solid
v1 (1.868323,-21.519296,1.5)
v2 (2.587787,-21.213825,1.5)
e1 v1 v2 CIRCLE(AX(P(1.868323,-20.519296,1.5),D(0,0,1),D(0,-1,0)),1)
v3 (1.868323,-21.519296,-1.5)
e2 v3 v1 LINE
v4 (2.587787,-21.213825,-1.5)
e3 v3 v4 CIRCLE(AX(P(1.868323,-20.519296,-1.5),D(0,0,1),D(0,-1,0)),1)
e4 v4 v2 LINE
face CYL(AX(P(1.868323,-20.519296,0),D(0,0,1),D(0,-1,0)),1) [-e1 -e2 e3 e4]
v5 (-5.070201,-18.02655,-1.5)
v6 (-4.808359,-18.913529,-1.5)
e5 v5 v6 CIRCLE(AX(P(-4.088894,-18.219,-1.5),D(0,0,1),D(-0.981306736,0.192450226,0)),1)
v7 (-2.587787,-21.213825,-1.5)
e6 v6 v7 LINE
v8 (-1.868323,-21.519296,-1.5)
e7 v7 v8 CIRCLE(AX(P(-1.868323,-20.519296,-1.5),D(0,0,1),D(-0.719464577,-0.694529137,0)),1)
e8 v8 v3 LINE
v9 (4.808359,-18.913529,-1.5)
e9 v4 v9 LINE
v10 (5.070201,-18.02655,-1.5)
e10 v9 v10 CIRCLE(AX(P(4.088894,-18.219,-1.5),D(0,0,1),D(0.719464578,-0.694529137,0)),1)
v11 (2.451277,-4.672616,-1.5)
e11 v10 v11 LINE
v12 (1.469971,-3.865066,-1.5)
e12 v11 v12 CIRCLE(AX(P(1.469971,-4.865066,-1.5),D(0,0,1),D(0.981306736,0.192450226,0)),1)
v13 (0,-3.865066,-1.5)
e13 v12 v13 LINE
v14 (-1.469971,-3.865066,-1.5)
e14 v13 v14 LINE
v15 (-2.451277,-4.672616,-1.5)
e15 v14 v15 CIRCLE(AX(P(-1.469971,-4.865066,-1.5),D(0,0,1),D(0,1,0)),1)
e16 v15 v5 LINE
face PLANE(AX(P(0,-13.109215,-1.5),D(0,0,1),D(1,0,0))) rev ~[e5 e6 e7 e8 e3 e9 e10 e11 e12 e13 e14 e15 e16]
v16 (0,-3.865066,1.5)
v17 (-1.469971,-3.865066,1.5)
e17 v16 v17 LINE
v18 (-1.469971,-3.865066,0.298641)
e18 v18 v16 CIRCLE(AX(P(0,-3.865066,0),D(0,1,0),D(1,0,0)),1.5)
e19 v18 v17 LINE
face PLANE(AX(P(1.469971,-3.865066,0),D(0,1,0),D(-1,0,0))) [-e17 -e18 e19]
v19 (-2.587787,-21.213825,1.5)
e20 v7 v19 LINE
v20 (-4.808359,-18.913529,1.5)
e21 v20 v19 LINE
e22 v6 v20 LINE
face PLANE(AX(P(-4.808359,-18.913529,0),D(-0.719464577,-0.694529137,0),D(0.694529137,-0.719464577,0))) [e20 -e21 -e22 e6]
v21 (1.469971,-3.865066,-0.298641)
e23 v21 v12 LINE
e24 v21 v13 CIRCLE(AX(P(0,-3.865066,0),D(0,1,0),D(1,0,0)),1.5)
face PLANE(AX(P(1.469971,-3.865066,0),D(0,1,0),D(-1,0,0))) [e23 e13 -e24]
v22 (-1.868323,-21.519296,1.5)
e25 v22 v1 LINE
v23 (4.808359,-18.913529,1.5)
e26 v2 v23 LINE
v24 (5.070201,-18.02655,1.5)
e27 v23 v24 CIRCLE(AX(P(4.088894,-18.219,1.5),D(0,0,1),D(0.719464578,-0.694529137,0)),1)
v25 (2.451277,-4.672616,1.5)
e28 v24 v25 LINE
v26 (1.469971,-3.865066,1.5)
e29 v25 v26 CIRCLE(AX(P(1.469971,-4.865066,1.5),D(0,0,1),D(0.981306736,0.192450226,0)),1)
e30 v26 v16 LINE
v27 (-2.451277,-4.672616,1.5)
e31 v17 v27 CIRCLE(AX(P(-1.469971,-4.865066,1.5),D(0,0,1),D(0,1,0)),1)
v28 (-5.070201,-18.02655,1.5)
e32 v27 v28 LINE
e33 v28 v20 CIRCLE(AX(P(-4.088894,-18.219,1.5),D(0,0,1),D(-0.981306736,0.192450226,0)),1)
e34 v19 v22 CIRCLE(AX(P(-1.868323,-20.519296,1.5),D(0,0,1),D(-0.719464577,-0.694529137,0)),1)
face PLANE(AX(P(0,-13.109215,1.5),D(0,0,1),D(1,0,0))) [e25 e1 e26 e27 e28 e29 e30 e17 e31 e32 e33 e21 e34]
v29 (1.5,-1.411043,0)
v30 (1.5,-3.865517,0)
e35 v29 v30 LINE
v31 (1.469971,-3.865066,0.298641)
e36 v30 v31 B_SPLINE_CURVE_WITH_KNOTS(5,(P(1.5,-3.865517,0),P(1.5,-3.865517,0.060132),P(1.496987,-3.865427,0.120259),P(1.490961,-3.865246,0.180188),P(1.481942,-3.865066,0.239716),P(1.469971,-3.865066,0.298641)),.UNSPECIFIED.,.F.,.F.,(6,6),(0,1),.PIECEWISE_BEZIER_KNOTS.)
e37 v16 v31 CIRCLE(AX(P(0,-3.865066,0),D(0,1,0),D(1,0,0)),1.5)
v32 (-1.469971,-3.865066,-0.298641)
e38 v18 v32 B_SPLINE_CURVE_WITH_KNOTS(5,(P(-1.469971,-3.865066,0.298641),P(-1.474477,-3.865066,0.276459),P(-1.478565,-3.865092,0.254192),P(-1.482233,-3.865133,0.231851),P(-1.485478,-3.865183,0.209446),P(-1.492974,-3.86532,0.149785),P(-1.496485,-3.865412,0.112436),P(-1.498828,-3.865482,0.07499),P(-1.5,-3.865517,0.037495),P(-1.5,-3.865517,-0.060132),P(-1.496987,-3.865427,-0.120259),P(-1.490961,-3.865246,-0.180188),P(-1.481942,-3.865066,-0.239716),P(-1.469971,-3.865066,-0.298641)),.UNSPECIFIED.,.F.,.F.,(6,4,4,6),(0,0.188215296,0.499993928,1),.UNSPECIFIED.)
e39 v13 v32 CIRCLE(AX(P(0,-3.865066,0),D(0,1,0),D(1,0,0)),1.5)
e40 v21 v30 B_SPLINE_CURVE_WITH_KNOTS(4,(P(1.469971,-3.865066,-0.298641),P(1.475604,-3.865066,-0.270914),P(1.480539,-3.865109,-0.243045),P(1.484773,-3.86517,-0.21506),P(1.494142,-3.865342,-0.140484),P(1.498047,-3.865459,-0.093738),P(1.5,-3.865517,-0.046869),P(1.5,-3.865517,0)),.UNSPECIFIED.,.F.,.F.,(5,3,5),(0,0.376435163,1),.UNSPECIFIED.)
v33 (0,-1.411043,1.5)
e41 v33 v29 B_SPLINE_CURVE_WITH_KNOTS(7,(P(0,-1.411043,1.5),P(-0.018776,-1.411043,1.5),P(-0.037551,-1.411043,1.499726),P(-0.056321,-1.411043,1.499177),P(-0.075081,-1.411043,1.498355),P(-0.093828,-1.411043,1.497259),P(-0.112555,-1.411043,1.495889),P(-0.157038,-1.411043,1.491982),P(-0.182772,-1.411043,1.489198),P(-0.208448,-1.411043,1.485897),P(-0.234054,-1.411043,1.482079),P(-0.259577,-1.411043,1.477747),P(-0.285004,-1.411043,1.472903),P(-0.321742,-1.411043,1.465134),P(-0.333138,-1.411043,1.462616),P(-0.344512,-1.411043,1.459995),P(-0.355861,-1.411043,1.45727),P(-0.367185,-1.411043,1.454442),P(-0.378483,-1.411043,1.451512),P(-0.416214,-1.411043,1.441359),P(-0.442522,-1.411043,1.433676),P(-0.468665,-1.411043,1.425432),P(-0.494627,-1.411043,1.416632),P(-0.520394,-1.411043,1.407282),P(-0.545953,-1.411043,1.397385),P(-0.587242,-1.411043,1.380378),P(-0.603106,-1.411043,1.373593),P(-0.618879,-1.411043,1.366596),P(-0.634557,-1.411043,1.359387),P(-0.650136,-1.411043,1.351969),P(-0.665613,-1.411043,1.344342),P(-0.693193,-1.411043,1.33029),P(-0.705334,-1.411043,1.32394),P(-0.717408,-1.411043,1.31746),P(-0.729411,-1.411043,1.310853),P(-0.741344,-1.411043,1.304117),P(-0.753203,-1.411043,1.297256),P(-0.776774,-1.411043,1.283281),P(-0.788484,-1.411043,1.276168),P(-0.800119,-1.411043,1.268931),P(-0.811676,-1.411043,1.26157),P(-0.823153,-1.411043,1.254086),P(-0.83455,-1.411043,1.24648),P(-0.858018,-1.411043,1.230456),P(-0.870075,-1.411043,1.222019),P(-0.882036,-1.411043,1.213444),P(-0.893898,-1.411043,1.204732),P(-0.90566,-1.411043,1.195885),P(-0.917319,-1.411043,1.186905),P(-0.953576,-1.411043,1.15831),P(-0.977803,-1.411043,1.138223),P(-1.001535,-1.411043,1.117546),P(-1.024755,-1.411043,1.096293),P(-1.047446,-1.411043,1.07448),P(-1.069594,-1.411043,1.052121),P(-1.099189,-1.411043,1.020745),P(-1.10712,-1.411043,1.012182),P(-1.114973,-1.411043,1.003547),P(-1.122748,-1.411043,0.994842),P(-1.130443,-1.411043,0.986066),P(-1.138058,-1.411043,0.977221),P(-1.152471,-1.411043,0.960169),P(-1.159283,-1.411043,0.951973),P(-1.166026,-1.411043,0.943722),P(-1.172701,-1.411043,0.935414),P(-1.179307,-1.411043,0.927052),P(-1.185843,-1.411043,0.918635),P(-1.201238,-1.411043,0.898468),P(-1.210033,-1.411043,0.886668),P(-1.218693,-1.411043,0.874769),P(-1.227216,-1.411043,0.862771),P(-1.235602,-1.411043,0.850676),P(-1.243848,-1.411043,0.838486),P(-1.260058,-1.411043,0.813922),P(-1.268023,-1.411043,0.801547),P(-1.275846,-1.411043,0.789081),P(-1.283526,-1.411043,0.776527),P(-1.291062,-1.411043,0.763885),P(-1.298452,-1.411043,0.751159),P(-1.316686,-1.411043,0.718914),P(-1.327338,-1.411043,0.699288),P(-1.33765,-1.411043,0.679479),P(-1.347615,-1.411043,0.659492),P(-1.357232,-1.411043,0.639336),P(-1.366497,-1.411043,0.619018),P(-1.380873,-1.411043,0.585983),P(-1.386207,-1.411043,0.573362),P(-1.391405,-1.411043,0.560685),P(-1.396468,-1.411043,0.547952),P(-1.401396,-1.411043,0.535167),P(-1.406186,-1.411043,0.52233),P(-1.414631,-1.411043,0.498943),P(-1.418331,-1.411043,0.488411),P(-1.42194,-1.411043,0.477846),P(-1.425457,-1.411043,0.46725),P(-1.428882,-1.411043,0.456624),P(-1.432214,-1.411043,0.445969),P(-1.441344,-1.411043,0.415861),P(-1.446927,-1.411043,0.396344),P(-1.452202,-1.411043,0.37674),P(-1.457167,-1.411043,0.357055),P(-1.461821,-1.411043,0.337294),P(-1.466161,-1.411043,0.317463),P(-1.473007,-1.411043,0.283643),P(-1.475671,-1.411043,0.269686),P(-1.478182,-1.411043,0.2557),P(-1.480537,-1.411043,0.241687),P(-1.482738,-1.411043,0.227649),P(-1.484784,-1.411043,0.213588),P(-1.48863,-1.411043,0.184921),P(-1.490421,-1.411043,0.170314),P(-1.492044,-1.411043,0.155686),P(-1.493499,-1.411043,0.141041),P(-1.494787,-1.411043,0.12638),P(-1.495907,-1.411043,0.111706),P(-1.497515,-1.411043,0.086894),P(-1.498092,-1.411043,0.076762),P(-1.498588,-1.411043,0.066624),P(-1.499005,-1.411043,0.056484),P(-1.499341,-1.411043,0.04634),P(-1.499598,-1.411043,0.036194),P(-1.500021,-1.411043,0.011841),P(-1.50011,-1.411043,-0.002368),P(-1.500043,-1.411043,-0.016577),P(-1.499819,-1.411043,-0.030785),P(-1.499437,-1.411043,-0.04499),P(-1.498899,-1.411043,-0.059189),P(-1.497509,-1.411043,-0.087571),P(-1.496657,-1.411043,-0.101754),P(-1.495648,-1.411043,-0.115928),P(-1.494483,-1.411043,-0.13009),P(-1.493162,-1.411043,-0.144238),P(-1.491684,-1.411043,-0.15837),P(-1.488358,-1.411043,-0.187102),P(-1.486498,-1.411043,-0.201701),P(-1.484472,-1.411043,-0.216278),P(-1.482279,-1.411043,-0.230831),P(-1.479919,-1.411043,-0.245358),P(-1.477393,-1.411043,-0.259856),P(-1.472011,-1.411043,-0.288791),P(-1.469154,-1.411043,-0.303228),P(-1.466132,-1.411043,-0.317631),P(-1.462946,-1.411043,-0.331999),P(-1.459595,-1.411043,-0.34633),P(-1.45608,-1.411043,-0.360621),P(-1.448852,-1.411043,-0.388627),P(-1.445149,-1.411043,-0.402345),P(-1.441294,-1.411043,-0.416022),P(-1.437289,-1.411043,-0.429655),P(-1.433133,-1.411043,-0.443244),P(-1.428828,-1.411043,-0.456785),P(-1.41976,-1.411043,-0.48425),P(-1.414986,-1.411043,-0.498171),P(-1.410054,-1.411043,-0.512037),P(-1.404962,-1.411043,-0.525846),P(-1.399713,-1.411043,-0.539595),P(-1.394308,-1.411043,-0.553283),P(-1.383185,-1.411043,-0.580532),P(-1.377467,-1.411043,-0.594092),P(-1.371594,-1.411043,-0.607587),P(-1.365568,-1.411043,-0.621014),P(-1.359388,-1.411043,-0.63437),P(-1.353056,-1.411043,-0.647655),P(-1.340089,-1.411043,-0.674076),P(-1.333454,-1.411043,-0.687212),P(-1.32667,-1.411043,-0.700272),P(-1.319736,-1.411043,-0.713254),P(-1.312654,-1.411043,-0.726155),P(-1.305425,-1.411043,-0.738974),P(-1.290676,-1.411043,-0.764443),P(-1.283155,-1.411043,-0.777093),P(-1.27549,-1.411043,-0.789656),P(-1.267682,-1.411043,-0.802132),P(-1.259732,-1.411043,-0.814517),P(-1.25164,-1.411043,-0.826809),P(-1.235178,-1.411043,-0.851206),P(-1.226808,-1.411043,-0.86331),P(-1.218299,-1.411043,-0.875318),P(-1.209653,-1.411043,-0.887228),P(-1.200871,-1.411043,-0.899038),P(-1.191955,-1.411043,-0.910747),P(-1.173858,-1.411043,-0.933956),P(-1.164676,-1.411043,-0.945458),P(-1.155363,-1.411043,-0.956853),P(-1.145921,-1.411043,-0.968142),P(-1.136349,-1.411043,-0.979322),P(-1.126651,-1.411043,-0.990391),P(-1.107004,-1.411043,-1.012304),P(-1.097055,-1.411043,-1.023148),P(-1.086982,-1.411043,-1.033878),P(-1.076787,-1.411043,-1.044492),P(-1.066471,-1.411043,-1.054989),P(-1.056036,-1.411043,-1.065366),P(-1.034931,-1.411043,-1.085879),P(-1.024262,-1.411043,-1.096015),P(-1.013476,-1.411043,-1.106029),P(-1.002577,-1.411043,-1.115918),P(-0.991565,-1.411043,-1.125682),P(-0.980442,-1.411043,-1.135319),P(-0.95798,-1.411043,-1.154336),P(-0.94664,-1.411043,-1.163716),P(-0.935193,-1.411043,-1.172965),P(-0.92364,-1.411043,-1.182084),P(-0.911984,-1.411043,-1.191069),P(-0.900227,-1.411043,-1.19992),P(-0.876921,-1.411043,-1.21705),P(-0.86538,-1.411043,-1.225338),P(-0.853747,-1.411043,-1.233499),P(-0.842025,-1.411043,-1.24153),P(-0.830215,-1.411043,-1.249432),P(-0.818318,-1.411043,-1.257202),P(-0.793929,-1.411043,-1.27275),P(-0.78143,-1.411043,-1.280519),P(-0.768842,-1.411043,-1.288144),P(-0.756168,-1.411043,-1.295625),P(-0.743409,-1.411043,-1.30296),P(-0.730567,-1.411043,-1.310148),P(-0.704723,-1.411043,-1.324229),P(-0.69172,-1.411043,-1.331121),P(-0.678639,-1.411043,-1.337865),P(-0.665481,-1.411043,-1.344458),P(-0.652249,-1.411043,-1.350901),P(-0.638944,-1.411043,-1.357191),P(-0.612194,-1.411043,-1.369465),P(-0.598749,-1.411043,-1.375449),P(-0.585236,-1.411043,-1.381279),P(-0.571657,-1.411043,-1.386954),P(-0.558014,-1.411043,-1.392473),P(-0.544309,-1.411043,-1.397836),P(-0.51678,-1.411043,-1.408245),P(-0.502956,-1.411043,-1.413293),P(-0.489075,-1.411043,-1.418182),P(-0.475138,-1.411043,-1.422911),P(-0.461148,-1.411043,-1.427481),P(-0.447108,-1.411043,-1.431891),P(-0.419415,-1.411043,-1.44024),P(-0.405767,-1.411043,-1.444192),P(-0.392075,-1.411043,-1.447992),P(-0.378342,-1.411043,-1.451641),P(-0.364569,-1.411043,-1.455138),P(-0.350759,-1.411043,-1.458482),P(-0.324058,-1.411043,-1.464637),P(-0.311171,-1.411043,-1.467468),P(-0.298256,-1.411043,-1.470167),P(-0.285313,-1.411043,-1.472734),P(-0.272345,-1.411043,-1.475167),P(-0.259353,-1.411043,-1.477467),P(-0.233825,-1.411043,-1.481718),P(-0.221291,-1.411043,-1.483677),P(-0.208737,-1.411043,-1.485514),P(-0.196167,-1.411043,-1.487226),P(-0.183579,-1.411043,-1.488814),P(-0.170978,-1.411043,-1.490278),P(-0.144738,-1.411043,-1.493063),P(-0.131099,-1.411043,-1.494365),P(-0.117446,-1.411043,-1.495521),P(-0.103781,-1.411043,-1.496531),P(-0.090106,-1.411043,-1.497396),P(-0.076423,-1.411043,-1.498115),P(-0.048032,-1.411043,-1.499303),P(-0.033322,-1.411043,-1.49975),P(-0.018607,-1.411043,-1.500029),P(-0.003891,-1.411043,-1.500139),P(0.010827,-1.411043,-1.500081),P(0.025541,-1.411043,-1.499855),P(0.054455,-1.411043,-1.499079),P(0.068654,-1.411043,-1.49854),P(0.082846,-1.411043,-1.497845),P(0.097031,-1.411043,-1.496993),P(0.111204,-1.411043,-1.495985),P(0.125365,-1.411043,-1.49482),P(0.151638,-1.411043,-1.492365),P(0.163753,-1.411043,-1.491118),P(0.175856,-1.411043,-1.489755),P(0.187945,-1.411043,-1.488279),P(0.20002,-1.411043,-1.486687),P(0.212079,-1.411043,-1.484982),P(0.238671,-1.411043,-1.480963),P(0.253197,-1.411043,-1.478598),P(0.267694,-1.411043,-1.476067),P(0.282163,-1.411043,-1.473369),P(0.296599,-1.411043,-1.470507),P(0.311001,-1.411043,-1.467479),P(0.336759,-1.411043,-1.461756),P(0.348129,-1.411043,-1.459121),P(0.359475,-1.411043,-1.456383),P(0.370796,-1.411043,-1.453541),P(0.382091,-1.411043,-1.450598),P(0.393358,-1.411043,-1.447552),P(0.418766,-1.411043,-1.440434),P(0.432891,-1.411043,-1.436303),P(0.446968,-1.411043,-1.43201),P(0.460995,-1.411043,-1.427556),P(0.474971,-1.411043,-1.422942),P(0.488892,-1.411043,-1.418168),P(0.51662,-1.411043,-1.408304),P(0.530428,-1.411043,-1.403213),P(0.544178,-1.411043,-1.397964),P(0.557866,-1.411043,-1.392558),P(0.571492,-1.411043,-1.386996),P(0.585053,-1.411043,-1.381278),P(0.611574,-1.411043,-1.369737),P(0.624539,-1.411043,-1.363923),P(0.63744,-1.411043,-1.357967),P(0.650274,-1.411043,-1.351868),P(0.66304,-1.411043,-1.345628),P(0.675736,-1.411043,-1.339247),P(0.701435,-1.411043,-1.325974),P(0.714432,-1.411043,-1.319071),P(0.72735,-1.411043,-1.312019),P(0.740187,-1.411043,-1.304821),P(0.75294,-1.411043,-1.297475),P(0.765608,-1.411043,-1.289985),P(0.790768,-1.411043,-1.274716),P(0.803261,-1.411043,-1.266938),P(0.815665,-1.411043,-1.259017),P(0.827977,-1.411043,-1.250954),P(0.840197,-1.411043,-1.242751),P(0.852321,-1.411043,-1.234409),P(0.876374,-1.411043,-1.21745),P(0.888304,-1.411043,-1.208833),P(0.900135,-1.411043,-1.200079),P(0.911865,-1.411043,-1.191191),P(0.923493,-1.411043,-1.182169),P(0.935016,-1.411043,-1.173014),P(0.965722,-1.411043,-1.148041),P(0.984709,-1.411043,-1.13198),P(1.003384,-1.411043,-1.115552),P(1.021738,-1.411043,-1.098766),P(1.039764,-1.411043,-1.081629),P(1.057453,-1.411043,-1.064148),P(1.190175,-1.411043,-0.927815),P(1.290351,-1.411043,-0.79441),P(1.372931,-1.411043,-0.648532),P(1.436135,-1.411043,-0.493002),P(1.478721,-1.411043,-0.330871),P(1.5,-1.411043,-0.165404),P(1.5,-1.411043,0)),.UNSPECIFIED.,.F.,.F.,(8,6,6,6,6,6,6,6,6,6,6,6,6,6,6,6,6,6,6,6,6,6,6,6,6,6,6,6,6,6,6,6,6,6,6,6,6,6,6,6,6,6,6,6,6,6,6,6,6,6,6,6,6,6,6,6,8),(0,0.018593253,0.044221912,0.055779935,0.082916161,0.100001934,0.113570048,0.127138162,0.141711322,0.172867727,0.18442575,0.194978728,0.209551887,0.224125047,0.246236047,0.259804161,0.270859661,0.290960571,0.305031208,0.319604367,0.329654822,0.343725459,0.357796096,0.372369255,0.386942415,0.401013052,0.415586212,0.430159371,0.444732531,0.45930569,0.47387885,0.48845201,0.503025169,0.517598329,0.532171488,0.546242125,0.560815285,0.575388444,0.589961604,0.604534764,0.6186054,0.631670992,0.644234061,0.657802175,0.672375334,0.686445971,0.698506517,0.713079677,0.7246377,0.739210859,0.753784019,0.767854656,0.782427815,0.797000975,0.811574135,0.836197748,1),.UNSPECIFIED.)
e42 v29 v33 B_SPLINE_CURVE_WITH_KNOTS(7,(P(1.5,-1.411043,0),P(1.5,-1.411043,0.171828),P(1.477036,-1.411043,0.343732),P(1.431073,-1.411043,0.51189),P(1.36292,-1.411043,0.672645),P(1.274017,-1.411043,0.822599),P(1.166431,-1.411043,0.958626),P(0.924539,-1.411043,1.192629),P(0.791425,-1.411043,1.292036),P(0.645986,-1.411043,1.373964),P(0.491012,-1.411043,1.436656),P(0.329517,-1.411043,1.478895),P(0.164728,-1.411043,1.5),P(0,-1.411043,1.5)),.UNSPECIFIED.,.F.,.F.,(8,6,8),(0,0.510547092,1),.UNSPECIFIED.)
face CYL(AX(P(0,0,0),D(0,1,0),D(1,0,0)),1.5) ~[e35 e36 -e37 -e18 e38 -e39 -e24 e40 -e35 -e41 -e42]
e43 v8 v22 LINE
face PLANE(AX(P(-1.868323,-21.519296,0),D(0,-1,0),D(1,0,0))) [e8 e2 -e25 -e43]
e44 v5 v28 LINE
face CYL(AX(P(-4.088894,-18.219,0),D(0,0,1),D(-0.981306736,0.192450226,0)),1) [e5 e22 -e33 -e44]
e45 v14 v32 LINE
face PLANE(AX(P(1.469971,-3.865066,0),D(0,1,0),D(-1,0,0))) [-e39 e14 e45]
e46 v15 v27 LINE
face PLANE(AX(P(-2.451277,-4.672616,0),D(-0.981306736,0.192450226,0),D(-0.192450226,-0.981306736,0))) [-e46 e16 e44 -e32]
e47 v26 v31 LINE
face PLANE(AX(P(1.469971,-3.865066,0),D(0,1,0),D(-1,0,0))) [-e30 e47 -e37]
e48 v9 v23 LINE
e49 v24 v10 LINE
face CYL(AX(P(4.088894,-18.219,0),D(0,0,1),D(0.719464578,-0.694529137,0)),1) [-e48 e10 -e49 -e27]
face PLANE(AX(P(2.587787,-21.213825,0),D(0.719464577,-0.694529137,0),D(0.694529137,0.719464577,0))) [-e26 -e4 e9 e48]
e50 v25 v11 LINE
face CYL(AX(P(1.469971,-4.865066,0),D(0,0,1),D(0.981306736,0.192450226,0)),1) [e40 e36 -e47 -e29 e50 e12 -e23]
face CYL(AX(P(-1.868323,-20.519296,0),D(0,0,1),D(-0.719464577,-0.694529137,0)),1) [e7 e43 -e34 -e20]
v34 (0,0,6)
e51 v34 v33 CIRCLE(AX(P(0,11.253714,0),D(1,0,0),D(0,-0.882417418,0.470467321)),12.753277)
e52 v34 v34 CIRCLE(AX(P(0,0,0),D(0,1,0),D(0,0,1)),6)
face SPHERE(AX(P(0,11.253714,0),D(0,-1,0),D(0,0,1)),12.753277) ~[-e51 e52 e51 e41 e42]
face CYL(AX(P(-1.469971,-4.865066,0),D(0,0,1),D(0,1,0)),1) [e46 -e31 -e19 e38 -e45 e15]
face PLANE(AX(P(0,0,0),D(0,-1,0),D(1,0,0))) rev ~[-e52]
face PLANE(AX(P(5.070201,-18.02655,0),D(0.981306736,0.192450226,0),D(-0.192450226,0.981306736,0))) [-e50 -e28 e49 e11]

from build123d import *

# Parameters (mm, degrees)
F2_R     = 1.5
F3_DEPTH = 4
F5_DEPTH = 1.5


with BuildPart() as f1:
    # F0 (on Right) → F1 (revolve)
    with BuildSketch(Plane.YZ):
        with BuildLine():
            Line((0, 0), (0, 6))
            ThreePointArc((0, 6), (-1.1189941578, 3.0922762594), (-1.4995632221, 0))
            Line((-1.4995632221, 0), (0, 0))
        make_face()
    revolve(axis=Axis((0, 0.9339665994, 0), (0, 1, 0)))

    # F2 (on Front) → F3 (join)
    with BuildSketch(Plane.XZ):
        Circle(F2_R)
    extrude(amount=F3_DEPTH)

    # F4 (on Top) → F5 (join, symmetric)
    with BuildSketch(Plane.XY):
        with BuildLine():
            Line((1.4699705266, -3.8650664501), (0, -3.8650664501))
            Line((0, -3.8650664501), (-1.4699705266, -3.8650664501))
            ThreePointArc((-1.4699705266, -3.8650664501), (-2.105403361, -4.0929103047), (-2.4512772628, -4.6726162242))
            Line((-2.4512772628, -4.6726162242), (-5.0702010152, -18.0265497334))
            ThreePointArc((-5.0702010152, -18.0265497334), (-5.0479765813, -18.5021273815), (-4.8083588564, -18.913529096))
            Line((-4.8083588564, -18.913529096), (-2.5877873591, -21.213825008))
            ThreePointArc((-2.5877873591, -21.213825008), (-2.2591365885, -21.4397656254), (-1.8683227817, -21.5192958713))
            Line((-1.8683227817, -21.5192958713), (0, -21.5192958713))
            Line((0, -21.5192958713), (1.8683227817, -21.5192958713))
            ThreePointArc((1.8683227817, -21.5192958713), (2.2591365885, -21.4397656254), (2.5877873591, -21.213825008))
            Line((2.5877873591, -21.213825008), (4.8083588564, -18.913529096))
            ThreePointArc((4.8083588564, -18.913529096), (5.0479765813, -18.5021273815), (5.0702010152, -18.0265497334))
            Line((5.0702010152, -18.0265497334), (2.4512772628, -4.6726162242))
            ThreePointArc((2.4512772628, -4.6726162242), (2.105403361, -4.0929103047), (1.4699705266, -3.8650664501))
        make_face()
    extrude(amount=F5_DEPTH, both=True)


solid = f1.part
